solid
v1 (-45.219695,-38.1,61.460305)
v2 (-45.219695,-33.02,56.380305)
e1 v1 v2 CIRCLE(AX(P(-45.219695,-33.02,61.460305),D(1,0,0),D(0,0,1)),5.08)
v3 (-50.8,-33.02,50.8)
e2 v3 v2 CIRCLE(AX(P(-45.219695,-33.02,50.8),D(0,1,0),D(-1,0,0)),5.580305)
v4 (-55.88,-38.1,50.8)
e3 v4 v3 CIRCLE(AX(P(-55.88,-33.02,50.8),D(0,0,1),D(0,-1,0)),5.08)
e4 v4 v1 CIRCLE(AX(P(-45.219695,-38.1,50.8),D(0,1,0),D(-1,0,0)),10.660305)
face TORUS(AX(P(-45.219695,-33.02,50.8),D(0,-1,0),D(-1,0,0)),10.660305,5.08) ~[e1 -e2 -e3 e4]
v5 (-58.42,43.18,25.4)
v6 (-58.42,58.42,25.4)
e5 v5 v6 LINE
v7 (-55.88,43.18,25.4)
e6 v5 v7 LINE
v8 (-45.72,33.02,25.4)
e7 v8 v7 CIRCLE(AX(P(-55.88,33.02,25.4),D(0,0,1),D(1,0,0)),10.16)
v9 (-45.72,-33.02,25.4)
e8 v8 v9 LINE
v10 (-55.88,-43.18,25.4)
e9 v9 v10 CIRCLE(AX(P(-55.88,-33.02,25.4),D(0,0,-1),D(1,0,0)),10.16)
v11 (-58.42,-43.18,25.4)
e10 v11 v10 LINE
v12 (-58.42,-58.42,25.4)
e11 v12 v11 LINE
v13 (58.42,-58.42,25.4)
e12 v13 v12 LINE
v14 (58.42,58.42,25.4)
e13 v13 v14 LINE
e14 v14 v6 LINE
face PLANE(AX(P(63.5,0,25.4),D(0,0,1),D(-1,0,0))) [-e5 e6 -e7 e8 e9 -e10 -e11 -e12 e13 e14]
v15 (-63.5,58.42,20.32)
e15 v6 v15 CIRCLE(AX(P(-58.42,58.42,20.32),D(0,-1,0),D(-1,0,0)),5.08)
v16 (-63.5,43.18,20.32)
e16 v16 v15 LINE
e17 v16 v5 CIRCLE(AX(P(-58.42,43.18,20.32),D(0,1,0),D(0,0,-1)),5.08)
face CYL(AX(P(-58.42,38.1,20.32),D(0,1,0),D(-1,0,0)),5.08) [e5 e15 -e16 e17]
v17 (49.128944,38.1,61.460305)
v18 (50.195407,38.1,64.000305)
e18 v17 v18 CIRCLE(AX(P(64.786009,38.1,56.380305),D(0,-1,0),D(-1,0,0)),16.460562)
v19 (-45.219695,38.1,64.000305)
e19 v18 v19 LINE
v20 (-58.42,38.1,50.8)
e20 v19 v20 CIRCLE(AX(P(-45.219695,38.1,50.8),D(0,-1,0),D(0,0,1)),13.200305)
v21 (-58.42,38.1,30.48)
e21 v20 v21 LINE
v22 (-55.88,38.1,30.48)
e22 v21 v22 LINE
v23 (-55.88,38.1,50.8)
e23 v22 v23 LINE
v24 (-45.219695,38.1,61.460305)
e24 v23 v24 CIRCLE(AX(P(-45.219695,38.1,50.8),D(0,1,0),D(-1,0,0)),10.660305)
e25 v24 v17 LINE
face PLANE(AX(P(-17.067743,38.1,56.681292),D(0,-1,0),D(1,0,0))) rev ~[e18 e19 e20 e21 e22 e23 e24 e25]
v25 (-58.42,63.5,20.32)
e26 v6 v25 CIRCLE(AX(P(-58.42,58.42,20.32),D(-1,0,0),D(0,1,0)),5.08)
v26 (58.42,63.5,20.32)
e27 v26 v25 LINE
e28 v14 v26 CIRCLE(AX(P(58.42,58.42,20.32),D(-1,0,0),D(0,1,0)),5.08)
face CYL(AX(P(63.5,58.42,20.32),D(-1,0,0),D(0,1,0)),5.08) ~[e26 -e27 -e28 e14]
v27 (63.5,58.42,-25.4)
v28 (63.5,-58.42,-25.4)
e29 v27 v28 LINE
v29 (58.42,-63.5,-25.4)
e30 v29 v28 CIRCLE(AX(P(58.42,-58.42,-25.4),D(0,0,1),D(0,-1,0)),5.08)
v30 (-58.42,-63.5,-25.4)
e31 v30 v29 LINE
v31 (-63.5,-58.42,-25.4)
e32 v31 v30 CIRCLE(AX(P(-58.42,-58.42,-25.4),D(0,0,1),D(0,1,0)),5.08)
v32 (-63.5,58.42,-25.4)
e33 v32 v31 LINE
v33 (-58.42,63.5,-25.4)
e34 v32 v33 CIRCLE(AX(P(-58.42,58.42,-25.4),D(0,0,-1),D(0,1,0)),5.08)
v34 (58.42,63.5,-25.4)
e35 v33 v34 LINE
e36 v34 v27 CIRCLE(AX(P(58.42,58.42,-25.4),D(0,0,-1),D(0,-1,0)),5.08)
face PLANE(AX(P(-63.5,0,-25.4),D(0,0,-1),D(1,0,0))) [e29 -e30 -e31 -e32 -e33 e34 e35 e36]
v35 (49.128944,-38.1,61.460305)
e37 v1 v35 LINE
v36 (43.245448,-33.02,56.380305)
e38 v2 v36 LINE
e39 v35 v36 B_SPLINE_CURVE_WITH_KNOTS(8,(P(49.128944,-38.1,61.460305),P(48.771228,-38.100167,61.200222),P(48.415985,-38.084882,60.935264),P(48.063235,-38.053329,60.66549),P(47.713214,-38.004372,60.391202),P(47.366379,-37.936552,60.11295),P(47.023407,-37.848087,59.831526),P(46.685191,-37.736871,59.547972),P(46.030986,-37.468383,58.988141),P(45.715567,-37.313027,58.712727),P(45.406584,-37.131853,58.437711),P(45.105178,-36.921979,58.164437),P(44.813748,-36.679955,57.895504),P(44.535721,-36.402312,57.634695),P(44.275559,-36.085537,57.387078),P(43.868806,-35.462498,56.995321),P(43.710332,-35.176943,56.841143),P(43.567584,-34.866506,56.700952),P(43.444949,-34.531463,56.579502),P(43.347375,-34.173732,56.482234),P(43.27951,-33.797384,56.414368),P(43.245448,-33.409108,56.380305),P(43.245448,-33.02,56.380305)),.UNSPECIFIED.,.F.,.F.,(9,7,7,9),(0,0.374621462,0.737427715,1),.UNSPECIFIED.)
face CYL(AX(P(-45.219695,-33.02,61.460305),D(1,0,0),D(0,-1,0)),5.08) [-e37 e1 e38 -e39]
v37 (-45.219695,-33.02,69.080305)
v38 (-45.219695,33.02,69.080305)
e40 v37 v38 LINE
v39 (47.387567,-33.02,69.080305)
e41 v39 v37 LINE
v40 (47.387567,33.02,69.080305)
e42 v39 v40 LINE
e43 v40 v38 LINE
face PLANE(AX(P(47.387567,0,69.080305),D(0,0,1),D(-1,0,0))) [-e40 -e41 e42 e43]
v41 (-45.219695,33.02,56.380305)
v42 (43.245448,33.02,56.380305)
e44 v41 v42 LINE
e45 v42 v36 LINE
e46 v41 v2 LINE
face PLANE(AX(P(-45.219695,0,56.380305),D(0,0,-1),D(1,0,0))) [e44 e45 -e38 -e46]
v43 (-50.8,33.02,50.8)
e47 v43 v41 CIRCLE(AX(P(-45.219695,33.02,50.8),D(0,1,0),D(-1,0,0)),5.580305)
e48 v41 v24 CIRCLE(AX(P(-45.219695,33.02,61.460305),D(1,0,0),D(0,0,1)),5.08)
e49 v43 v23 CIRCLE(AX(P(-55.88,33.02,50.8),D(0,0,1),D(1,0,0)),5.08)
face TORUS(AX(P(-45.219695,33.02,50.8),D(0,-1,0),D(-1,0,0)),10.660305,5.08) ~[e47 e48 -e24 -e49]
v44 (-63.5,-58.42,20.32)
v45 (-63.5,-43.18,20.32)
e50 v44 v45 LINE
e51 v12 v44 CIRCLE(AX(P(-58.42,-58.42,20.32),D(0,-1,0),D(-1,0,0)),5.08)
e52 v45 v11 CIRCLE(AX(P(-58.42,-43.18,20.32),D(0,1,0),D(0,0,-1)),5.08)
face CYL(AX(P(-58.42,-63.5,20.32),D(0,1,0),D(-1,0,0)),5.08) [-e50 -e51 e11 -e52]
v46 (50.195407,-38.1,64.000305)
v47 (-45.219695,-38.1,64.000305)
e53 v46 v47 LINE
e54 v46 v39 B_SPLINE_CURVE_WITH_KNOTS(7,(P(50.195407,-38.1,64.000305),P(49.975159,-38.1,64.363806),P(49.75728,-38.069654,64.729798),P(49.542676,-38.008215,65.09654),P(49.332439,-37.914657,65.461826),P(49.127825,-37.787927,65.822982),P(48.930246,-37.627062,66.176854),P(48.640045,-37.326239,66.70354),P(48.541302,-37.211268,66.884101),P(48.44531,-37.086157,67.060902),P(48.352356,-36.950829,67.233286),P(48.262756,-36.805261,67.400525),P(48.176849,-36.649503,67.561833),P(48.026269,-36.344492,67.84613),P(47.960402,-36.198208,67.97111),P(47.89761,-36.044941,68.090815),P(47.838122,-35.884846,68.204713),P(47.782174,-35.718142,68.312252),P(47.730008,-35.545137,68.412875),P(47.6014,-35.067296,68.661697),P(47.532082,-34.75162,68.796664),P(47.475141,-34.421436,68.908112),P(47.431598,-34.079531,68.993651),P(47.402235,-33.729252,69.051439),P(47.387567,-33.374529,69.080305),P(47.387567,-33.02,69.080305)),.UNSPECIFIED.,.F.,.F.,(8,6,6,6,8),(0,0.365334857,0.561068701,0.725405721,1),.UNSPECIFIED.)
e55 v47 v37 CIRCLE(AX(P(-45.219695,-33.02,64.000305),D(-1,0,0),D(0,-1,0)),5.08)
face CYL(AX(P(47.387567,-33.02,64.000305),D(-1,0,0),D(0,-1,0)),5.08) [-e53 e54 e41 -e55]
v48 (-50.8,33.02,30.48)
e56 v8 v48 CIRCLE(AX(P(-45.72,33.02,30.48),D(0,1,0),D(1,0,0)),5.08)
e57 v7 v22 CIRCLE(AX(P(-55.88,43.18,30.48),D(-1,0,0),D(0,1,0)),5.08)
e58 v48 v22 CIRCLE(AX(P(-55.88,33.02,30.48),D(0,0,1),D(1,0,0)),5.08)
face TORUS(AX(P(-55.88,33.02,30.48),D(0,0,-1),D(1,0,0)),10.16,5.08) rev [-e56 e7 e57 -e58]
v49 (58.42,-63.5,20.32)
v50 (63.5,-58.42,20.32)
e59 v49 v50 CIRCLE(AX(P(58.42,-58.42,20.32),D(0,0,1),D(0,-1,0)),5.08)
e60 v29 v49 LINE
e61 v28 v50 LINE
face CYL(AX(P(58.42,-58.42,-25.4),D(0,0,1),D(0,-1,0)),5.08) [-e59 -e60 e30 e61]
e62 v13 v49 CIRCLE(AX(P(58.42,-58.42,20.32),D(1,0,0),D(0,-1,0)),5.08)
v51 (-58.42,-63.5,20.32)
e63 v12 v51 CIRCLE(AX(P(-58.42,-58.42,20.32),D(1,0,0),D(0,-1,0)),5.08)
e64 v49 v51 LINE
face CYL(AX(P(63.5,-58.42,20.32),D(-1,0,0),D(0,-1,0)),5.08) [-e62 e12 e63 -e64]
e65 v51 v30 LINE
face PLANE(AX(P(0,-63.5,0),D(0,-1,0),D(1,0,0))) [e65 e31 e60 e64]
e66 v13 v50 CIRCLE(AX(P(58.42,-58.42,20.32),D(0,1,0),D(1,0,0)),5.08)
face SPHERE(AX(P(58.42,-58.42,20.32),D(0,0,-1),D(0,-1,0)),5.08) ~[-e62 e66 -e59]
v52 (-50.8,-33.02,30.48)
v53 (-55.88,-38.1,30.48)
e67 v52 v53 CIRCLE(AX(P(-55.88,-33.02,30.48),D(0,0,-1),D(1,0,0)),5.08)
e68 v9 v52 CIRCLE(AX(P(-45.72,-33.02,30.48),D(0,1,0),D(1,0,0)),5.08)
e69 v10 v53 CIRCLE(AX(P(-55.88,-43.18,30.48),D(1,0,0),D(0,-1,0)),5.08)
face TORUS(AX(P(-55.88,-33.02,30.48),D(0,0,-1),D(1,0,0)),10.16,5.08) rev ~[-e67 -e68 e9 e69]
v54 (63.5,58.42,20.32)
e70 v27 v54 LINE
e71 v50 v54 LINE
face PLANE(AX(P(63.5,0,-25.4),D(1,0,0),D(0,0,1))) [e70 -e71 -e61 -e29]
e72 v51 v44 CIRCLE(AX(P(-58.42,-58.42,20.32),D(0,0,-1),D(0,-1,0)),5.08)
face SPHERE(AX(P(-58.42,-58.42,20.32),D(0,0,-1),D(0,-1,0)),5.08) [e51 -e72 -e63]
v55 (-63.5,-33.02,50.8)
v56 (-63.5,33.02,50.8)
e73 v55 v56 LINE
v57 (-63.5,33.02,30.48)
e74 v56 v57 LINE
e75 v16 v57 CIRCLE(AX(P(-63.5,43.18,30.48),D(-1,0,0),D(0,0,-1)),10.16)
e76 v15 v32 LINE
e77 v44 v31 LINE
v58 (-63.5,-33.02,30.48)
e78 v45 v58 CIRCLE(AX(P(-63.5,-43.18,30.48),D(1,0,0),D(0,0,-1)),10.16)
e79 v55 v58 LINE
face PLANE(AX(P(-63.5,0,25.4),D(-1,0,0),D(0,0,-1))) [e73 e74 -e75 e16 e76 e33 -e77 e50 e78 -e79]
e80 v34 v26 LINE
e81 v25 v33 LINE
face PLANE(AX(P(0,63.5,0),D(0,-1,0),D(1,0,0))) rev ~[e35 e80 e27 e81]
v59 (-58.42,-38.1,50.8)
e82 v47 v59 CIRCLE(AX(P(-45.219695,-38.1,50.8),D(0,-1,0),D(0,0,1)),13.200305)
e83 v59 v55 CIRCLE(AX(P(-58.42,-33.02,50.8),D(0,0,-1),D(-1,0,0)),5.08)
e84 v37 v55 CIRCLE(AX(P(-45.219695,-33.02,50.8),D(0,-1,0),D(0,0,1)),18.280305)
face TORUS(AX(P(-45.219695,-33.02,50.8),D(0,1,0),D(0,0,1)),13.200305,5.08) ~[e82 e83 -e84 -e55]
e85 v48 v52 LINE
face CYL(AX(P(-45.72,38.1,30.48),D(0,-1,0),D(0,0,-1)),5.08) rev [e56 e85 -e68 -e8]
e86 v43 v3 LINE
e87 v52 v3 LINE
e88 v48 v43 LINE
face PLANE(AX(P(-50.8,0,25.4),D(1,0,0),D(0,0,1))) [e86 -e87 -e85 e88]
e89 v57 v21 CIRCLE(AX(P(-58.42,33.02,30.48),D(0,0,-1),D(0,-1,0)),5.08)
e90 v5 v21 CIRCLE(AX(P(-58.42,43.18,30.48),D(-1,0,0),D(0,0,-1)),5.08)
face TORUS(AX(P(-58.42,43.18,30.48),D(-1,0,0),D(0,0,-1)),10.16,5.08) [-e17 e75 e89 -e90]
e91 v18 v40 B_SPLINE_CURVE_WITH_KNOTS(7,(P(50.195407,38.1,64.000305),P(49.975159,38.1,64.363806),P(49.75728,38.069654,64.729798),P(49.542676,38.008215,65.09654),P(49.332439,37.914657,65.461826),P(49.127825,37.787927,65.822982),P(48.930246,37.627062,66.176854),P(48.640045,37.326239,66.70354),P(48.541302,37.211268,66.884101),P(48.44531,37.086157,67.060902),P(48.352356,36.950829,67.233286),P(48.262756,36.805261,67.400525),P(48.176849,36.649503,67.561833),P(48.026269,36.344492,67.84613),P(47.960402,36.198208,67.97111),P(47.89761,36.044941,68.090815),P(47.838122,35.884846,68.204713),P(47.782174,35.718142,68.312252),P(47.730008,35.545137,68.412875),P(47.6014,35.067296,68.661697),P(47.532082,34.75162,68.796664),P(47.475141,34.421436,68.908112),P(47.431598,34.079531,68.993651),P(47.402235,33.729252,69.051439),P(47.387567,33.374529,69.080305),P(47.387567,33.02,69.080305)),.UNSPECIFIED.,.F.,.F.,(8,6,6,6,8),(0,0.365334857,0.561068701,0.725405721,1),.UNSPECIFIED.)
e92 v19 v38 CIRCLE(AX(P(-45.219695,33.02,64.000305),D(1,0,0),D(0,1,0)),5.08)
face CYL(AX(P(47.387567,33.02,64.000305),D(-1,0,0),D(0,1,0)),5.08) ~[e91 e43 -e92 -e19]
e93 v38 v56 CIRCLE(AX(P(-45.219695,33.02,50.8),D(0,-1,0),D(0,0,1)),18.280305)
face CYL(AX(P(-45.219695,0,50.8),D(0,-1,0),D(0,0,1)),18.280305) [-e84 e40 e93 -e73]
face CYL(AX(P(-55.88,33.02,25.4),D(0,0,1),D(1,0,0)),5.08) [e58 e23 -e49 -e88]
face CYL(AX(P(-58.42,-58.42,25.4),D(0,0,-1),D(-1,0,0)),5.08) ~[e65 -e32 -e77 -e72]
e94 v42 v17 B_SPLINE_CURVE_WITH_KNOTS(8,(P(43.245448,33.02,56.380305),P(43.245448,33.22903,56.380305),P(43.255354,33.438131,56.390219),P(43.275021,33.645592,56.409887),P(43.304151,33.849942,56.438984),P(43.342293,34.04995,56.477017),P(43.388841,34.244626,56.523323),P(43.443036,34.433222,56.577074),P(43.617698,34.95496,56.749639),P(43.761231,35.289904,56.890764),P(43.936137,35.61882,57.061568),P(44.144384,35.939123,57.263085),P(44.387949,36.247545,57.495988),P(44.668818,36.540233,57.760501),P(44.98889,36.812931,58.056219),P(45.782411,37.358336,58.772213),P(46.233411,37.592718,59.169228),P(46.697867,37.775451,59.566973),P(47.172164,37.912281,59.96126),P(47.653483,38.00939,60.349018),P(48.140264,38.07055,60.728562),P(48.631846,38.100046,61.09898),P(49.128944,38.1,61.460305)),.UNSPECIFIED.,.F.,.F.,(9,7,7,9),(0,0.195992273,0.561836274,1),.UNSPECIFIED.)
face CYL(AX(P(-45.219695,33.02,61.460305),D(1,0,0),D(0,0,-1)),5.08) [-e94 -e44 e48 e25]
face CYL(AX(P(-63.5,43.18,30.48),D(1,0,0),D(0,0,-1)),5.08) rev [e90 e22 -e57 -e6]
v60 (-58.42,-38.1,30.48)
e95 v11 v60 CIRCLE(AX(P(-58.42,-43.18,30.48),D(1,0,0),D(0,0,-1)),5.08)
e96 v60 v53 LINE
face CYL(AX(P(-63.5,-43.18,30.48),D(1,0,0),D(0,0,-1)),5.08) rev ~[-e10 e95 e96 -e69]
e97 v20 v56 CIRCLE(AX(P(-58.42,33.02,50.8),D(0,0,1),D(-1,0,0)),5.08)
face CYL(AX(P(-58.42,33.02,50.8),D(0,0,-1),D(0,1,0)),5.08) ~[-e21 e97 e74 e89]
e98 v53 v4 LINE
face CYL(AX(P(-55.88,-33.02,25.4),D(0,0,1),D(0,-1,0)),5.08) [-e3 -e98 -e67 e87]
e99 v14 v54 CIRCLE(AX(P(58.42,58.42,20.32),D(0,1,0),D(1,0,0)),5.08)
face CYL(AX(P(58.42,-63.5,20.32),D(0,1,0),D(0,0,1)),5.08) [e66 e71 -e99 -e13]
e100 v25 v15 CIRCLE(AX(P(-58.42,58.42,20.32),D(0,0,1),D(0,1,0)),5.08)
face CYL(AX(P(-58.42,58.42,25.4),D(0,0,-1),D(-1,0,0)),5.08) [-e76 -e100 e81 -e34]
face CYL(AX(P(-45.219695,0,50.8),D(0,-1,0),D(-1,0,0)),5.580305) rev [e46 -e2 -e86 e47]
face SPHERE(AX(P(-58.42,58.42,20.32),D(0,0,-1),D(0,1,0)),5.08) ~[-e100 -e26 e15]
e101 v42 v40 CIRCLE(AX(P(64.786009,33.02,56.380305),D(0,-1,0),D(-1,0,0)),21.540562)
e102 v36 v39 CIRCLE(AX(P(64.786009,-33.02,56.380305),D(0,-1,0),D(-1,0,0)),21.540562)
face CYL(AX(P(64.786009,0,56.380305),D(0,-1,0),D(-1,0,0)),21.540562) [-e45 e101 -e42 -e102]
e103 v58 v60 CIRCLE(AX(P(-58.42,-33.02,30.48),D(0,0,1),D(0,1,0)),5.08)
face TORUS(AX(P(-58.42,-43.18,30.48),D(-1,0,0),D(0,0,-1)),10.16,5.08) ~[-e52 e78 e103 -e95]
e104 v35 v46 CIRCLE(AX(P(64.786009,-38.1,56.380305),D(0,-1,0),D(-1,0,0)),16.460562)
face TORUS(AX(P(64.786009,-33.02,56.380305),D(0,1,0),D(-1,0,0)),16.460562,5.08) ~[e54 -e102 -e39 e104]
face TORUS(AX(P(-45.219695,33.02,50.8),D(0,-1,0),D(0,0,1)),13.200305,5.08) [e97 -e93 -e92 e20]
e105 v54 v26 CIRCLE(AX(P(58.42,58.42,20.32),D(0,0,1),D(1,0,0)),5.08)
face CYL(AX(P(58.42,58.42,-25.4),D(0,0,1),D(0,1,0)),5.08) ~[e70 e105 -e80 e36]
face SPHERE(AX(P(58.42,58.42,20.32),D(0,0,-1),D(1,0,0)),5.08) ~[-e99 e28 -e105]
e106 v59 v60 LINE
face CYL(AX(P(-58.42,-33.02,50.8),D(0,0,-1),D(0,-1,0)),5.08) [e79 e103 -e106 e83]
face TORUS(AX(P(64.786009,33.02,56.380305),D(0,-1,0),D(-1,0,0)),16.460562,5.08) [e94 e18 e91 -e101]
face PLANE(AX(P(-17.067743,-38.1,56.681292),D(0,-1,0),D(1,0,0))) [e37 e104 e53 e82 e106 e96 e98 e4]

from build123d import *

# Parameters (mm, degrees)
F1_DEPTH = 63.5
F2_DEPTH = 38.1
F3_R     = 5.08


with BuildPart() as f1:
    # F0 (on Front) → F1 (new body, symmetric)
    with BuildSketch(Plane.XZ):
        Polygon((-63.5, 25.4), (-63.5, -25.4), (63.5, -25.4), (63.5, 25.4), (-50.8, 25.4), align=None)
    extrude(amount=F1_DEPTH, both=True)

    # F0 (on Front) → F2 (join, symmetric)
    with BuildSketch(Plane.XZ):
        with BuildLine():
            Line((-63.5, 50.8), (-63.5, 25.4))
            Line((-63.5, 25.4), (-50.8, 25.4))
            Line((-50.8, 25.4), (-50.8, 50.8))
            ThreePointArc((-50.8, 50.8), (-49.1655663717, 54.7458718322), (-45.2196945395, 56.3803054605))
            Line((-45.2196945395, 56.3803054605), (43.2454477532, 56.3803054605))
            ThreePointArc((43.2454477532, 56.3803054605), (44.3071420431, 63.0595111043), (47.3875670326, 69.0803054605))
            Line((47.3875670326, 69.0803054605), (-45.2196945395, 69.0803054605))
            ThreePointArc((-45.2196945395, 69.0803054605), (-58.1458224928, 63.7261279533), (-63.5, 50.8))
        make_face()
        with BuildLine():
            Line((64.7860094905, 69.0803054605), (47.3875670326, 69.0803054605))
            ThreePointArc((47.3875670326, 69.0803054605), (44.3071420431, 63.0595111043), (43.2454477532, 56.3803054605))
            Line((43.2454477532, 56.3803054605), (64.7860094905, 56.3803054605))
            Line((64.7860094905, 56.3803054605), (64.7860094905, 69.0803054605))
        make_face()
        with BuildLine():
            ThreePointArc((86.3265712278, 56.3803054605), (71.4652151342, 76.8591729079), (47.3875670326, 69.0803054605))
            Line((47.3875670326, 69.0803054605), (64.7860094905, 69.0803054605))
            Line((64.7860094905, 69.0803054605), (64.7860094905, 56.3803054605))
            Line((64.7860094905, 56.3803054605), (43.2454477532, 56.3803054605))
            ThreePointArc((43.2454477532, 56.3803054605), (64.7860094905, 34.8397437232), (86.3265712278, 56.3803054605))
        make_face()
    extrude(amount=F2_DEPTH, both=True)

    # F3
    f3_edges = [f1.edges().sort_by_distance(p)[0] for p in [
        (63.5, -63.5, 0),
        (-63.5, -63.5, 0),
        (63.5, 63.5, 0),
        (-63.5, 63.5, 0),
        (-58.145822, -38.1, 63.726128),
        (-63.5, -38.1, 38.1),
        (-57.15, -38.1, 25.4),
        (-50.8, -38.1, 38.1),
        (-49.165566, -38.1, 54.745872),
        (-0.987123, -38.1, 56.380305),
        (85.264877, -38.1, 49.7011),
        (1.083936, -38.1, 69.080305),
        (-58.145822, 38.1, 63.726128),
        (-63.5, 38.1, 38.1),
        (-57.15, 38.1, 25.4),
        (-50.8, 38.1, 38.1),
        (-49.165566, 38.1, 54.745872),
        (-0.987123, 38.1, 56.380305),
        (85.264877, 38.1, 49.7011),
        (1.083936, 38.1, 69.080305),
        (0, -63.5, 25.4),
        (63.5, 0, 25.4),
        (0, 63.5, 25.4),
        (-63.5, -50.8, 25.4),
        (-63.5, 50.8, 25.4),
        (-50.8, 0, 25.4),
    ]]
    fillet(f3_edges, radius=F3_R)


solid = f1.part
